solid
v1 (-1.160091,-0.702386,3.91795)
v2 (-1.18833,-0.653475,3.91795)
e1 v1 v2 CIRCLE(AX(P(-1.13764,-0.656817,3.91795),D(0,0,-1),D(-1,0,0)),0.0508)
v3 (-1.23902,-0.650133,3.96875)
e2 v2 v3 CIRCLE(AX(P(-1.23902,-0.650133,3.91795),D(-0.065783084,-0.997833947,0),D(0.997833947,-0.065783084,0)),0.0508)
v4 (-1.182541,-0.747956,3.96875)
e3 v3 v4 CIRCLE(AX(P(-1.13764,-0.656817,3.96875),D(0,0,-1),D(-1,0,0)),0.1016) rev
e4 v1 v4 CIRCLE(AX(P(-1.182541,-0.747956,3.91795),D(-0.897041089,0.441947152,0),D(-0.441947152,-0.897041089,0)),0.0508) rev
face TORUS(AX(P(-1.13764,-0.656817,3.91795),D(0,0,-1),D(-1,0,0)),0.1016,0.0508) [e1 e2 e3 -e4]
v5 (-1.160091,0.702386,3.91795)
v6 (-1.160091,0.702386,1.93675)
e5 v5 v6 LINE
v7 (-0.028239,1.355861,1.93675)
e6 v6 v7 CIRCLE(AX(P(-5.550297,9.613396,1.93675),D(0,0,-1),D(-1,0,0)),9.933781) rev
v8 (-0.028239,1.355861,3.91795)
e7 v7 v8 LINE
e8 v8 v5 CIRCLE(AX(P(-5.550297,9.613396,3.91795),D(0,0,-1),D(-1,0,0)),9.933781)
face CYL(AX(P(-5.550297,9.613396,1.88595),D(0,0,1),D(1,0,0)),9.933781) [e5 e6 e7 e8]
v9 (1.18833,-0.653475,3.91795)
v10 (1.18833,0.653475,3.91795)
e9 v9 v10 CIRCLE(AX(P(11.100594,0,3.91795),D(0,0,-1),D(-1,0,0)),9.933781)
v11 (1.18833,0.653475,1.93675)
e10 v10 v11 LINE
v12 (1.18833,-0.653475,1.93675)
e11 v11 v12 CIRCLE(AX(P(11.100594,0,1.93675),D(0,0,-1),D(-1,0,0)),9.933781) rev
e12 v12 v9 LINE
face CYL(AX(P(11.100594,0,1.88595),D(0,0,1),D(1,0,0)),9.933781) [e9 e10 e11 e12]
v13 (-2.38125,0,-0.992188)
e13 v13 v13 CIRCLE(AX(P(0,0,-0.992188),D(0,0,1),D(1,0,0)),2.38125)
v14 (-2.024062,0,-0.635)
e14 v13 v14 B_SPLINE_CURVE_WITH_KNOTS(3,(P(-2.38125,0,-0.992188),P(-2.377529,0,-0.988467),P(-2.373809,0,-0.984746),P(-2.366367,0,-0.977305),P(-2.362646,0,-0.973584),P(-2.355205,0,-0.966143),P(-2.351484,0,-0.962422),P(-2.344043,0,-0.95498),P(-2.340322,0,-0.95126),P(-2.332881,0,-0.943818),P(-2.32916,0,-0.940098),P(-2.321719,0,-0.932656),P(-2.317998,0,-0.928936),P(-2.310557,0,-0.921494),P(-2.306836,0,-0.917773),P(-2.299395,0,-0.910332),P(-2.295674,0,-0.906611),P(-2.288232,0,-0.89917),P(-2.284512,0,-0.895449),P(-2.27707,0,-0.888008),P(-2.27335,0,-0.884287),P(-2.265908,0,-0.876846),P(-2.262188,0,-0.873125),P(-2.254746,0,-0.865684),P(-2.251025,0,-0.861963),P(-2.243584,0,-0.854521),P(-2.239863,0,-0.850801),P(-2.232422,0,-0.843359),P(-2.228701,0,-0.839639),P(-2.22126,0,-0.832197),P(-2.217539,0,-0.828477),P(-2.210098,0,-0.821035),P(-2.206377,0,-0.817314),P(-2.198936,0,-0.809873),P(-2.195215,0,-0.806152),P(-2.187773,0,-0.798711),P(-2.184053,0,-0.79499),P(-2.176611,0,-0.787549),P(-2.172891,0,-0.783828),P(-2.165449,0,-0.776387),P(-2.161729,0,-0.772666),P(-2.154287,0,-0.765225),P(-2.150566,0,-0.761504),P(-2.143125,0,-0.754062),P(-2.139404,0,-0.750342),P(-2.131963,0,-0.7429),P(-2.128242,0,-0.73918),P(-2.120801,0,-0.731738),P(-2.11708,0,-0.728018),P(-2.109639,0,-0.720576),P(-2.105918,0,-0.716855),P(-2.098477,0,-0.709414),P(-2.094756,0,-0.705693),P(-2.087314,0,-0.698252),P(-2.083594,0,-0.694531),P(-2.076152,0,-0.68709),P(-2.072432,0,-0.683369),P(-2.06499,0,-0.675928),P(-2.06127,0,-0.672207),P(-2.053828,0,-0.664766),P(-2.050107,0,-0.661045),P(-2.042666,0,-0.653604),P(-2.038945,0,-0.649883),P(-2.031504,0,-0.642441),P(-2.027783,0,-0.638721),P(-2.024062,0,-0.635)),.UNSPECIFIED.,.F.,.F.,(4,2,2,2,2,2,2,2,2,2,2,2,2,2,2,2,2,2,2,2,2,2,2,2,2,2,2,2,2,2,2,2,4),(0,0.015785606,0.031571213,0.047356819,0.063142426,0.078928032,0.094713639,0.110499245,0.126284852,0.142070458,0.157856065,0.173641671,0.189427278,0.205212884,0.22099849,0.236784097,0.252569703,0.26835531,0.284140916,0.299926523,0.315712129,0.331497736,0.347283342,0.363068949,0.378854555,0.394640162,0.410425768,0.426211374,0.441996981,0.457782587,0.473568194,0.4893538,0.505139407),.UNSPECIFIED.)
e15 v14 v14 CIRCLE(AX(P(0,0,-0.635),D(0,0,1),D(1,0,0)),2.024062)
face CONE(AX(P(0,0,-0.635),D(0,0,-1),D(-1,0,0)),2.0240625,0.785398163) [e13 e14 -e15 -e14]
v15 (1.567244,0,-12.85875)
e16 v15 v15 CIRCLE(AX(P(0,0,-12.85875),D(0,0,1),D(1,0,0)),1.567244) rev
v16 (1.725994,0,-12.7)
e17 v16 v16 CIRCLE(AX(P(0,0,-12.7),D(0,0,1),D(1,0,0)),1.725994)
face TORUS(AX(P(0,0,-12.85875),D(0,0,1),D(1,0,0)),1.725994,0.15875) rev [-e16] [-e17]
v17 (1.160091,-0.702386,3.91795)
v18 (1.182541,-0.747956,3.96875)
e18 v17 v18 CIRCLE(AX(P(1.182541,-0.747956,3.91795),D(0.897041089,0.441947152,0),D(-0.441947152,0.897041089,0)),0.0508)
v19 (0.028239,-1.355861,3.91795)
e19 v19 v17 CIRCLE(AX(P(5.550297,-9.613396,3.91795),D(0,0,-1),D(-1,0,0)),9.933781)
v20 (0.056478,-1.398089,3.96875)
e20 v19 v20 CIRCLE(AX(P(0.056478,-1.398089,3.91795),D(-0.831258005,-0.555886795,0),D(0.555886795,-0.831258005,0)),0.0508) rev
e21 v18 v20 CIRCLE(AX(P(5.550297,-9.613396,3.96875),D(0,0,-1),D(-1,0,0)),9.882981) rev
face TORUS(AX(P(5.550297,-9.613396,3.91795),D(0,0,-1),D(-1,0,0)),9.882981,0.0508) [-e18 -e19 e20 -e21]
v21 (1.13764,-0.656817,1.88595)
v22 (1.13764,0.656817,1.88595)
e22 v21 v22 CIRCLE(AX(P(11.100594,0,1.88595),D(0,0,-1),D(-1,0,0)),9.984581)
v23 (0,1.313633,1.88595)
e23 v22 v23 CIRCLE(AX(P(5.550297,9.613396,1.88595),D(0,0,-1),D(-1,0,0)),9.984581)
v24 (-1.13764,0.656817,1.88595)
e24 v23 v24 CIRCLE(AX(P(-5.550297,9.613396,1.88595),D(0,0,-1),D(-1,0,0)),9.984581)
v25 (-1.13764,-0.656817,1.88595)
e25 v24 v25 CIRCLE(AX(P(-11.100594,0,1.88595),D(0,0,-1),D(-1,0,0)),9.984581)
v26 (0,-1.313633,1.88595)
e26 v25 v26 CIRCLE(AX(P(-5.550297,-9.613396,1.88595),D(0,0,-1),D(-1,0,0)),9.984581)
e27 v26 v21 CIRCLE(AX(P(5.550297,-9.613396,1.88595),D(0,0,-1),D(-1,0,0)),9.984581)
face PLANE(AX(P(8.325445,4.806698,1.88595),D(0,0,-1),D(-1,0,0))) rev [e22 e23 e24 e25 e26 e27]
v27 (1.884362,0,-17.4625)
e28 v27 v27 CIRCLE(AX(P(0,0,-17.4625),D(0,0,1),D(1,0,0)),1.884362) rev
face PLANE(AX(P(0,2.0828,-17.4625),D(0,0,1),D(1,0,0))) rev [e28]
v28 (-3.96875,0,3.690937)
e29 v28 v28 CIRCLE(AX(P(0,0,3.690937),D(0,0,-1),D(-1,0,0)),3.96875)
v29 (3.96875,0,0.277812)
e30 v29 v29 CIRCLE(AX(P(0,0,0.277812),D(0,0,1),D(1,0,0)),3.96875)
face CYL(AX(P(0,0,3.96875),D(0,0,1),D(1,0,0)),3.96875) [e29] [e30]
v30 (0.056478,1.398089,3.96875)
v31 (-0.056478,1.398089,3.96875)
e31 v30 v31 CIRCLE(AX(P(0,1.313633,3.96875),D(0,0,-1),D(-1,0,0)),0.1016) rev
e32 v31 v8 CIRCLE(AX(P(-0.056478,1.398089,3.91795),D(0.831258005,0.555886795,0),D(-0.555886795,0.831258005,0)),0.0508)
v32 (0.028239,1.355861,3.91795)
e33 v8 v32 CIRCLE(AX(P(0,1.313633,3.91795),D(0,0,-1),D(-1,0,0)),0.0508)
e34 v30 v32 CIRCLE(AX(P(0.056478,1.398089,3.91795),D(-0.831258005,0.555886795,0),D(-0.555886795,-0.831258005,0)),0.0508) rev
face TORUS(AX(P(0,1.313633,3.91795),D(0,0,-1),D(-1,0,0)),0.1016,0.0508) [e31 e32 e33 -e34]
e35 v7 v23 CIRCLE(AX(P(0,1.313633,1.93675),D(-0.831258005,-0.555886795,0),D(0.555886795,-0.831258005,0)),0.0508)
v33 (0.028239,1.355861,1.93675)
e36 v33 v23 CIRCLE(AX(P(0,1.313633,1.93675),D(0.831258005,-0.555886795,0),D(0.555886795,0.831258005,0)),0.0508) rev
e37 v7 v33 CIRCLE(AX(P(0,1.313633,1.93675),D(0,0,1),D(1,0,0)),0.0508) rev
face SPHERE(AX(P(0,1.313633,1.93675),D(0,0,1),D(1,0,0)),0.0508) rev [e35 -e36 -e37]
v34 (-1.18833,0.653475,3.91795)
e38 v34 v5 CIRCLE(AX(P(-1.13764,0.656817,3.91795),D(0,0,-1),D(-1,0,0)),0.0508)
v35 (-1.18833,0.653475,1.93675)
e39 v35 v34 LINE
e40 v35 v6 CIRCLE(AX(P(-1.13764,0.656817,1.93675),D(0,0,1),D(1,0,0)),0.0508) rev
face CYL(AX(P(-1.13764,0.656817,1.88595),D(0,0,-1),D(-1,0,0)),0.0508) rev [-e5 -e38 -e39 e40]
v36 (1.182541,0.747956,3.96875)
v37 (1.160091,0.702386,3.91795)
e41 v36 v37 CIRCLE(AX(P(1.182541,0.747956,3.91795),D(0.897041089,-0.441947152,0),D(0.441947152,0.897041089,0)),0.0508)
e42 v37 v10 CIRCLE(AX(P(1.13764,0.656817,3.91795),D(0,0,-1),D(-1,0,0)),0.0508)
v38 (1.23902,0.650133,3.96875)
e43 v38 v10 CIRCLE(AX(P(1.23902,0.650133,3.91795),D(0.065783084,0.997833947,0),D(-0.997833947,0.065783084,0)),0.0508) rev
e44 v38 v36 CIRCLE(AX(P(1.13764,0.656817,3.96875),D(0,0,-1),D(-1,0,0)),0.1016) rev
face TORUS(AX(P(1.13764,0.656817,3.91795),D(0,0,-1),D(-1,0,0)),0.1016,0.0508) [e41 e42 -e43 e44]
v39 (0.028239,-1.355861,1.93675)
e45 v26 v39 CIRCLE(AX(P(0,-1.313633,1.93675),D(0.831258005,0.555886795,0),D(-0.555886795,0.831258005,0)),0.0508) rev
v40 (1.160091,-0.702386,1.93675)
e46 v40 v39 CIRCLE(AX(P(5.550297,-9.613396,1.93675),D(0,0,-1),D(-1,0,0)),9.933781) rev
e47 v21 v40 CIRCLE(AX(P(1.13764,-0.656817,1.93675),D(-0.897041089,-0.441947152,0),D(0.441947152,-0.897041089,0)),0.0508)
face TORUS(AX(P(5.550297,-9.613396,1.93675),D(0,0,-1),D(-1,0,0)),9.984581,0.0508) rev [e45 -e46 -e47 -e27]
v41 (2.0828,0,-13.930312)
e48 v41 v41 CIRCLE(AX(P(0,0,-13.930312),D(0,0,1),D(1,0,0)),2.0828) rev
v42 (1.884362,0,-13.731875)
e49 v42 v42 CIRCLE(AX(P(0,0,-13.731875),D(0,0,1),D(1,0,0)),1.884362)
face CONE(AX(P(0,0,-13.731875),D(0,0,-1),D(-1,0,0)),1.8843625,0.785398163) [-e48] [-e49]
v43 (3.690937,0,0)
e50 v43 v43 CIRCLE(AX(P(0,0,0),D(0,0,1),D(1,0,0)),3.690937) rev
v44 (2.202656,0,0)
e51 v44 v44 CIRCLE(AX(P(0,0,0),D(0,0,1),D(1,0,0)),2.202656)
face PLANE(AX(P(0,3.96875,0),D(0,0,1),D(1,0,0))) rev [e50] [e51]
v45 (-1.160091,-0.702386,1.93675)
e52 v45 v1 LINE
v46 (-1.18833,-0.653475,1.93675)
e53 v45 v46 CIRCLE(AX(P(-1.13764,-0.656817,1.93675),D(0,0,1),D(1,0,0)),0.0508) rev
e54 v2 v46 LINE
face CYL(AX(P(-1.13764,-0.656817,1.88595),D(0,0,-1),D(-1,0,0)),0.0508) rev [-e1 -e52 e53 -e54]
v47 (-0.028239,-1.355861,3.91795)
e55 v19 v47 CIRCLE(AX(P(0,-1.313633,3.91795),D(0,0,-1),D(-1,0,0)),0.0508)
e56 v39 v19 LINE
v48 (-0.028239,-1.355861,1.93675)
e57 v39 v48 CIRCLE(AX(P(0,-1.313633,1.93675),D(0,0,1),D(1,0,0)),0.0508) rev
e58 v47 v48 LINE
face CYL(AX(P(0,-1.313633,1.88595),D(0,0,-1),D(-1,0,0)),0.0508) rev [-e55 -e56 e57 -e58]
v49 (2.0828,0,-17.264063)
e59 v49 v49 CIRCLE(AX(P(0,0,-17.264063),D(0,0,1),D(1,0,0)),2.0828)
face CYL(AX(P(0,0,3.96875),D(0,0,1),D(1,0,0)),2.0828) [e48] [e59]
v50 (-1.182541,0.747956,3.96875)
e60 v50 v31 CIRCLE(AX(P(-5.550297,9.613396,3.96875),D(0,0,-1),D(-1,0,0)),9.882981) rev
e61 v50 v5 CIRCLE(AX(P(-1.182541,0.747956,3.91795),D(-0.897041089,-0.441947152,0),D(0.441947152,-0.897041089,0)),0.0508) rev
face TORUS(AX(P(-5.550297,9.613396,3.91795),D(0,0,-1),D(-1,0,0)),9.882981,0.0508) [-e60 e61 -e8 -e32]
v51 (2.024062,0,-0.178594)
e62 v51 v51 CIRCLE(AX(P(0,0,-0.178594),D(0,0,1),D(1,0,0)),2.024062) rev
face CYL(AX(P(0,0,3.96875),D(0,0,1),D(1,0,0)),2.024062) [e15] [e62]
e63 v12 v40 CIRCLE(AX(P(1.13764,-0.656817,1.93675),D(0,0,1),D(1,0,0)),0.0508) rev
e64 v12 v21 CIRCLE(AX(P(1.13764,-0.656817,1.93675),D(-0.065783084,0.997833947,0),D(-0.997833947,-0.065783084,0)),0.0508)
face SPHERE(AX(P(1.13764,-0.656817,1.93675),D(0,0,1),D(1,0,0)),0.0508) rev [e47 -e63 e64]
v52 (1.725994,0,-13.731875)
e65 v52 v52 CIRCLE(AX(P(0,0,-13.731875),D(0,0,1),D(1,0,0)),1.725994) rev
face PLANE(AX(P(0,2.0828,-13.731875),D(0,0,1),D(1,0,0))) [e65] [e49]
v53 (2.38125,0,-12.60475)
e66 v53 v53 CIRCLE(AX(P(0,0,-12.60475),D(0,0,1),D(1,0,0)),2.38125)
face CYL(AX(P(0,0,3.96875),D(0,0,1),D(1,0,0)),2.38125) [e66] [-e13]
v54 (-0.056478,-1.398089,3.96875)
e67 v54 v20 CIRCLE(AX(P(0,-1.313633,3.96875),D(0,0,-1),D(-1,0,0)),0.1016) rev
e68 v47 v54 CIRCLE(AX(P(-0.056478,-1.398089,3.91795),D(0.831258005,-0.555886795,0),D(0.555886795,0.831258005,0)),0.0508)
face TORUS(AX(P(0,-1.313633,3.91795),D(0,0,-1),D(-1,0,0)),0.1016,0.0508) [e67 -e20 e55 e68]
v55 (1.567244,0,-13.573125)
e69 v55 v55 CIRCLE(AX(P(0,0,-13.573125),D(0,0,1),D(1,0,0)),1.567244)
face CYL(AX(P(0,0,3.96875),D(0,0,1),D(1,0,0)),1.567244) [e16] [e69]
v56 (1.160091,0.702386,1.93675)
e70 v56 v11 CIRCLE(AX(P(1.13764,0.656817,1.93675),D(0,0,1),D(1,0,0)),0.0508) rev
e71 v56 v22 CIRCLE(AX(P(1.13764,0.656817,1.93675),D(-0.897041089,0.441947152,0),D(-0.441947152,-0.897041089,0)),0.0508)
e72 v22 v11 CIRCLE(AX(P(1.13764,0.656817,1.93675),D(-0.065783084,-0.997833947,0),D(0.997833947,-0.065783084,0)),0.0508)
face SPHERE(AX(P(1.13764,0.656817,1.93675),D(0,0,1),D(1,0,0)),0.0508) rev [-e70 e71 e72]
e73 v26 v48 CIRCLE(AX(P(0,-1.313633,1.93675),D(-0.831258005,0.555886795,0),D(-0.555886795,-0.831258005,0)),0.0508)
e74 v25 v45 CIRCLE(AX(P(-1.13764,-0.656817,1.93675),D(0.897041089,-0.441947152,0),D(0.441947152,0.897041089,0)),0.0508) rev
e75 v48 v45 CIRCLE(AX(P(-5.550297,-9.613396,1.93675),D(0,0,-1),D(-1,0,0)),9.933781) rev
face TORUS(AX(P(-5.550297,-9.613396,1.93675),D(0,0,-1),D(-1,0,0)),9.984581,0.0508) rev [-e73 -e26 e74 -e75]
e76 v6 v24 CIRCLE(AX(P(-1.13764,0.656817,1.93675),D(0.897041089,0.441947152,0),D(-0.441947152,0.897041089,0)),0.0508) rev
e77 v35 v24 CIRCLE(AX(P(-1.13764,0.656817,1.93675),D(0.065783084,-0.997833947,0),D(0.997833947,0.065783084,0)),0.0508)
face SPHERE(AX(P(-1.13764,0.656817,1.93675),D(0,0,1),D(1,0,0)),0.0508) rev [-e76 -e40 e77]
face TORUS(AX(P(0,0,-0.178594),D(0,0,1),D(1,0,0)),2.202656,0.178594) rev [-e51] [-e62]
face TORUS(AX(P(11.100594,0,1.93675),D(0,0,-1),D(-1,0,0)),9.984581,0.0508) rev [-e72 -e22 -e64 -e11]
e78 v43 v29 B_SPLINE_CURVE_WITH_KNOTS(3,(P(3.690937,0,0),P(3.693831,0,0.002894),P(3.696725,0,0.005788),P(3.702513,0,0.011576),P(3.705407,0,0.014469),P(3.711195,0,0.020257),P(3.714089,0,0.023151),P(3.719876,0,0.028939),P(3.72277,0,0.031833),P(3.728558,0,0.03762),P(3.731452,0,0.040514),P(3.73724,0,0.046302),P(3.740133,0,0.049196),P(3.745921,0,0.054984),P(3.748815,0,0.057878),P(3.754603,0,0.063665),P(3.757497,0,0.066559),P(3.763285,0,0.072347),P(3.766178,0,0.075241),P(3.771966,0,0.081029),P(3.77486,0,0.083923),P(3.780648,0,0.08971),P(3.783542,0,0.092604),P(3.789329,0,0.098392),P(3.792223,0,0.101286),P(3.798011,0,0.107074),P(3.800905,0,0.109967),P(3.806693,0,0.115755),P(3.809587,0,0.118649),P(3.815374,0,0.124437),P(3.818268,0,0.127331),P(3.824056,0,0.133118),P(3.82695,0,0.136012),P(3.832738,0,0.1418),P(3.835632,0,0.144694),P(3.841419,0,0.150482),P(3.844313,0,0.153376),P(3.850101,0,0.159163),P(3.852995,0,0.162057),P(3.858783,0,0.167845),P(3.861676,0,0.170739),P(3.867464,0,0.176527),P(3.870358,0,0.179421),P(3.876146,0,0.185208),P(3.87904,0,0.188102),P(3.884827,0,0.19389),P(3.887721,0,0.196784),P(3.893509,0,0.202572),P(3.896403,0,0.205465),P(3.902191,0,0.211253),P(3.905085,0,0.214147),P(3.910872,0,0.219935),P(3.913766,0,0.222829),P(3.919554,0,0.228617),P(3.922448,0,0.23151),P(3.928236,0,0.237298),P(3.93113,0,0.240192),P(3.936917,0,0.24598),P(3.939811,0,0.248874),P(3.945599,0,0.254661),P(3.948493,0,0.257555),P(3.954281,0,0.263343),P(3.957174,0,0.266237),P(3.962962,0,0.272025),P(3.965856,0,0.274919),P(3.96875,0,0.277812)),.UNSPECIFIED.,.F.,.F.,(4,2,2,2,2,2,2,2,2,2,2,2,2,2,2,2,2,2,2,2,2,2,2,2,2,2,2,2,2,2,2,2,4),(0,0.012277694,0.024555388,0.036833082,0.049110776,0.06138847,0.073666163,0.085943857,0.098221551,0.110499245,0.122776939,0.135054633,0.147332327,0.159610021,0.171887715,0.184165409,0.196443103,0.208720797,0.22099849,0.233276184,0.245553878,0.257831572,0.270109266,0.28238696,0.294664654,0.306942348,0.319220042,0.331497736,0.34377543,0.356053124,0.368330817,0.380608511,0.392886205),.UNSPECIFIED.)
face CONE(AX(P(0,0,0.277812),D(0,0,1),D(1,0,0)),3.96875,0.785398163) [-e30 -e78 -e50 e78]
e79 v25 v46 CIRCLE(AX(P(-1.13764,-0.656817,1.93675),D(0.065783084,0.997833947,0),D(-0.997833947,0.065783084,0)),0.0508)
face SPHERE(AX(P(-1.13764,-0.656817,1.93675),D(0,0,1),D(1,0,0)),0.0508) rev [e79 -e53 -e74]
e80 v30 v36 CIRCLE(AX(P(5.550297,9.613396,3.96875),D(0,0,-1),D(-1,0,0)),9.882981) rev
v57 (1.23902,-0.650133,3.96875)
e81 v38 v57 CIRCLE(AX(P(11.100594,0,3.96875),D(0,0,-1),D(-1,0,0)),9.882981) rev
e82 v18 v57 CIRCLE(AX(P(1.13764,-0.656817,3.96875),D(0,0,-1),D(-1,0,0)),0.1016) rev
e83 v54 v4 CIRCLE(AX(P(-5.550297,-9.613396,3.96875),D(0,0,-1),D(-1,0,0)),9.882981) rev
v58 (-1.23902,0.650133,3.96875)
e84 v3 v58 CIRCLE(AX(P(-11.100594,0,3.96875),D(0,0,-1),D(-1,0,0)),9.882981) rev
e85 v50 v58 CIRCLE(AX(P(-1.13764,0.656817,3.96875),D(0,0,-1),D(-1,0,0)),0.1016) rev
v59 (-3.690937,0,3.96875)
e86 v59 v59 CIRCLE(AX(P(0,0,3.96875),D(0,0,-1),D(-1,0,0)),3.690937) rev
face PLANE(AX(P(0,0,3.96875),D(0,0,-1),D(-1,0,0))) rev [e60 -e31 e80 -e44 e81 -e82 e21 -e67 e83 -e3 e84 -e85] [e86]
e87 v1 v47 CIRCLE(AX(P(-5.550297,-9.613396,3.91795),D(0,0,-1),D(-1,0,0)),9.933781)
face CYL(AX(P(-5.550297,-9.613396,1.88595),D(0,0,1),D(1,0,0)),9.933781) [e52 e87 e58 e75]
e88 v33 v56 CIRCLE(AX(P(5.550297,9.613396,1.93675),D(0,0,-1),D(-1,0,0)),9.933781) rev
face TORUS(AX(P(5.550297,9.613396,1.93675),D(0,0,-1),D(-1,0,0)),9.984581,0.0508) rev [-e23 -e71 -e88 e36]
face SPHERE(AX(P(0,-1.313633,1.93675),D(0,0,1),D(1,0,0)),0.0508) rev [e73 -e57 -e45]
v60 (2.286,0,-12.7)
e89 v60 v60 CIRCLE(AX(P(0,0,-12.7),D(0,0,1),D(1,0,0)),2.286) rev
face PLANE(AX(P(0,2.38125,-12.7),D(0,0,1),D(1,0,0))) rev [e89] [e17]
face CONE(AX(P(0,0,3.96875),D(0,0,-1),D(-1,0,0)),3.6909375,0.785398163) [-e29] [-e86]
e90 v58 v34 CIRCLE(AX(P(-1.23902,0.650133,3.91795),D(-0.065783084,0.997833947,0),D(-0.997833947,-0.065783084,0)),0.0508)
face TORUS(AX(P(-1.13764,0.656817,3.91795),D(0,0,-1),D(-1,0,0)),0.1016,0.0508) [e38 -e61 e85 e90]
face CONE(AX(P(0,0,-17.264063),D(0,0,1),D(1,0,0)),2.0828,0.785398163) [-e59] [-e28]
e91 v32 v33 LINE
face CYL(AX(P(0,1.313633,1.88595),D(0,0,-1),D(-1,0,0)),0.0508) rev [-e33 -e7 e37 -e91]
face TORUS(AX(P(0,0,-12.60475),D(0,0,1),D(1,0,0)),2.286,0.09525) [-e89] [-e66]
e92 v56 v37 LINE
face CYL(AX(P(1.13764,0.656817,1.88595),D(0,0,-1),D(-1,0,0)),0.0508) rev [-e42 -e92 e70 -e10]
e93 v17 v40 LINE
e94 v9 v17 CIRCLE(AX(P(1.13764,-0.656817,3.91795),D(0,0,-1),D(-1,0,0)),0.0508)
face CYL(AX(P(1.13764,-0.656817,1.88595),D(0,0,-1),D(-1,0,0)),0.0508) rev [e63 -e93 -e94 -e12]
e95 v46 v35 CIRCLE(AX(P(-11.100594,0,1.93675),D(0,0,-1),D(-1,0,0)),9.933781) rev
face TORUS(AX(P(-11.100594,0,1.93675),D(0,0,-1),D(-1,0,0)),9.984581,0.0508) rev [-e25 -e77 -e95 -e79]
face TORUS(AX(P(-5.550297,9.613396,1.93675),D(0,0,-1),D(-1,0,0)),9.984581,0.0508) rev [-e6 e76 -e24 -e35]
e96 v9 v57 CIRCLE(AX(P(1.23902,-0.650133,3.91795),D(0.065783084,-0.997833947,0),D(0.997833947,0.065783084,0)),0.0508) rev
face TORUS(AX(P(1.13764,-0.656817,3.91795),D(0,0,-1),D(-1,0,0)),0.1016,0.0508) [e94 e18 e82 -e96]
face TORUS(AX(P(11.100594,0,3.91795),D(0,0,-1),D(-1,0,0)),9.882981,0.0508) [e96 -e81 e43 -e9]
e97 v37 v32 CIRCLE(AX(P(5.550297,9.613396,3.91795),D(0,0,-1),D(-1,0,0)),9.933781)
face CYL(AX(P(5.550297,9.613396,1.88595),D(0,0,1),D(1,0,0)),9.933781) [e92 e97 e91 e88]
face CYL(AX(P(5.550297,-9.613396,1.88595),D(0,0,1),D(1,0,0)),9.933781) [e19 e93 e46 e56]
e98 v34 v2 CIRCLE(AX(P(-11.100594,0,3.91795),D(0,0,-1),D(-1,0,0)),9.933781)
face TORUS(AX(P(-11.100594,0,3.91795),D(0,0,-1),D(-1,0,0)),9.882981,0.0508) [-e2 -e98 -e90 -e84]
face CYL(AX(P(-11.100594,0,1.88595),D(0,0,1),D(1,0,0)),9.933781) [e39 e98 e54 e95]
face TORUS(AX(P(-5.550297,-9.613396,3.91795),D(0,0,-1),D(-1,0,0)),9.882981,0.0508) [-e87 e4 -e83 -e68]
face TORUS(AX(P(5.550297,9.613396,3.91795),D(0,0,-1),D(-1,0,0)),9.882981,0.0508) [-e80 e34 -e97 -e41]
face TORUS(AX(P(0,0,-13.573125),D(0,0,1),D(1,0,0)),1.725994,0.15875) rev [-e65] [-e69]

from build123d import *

# Parameters (mm, degrees)
SKETCH4_W          = 0.9921875
SKETCH4_H          = 0.3571875
SKETCH4_W_2        = 1.031875
SKETCH4_H_2        = 0.515555748
CHAMFER1_SIZE      = 0.3571875
FILLET1_R          = 0.17859375
FILLET2_R          = 0.15875
CHAMFER2_SIZE      = 0.1984375
FILLET3_R          = 0.09525
CHAMFER3_SIZE      = 0.2778125
CUT_EXTRUDE1_DEPTH = 2.0828
FILLET4_R          = 0.0508


with BuildPart() as part:
    # Sketch3 → Revolve1 (revolve)
    with BuildSketch(Plane(origin=(0, 0, 0), x_dir=(0, 0, -1), z_dir=(1, 0, 0)), mode=Mode.PRIVATE) as revolve1_sk:
        Polygon((-3.96875, 3.96875), (0, 3.96875), (0, 2.38125), (12.7, 2.38125), (12.7, 2.0828), (17.4625, 2.0828), (17.4625, 0), (-3.96875, 0), align=None)
    revolve(revolve1_sk.sketch.rotate(Axis((0, 0, 3.96875), (0, 0, -1)), 90), axis=Axis((0, 0, 3.96875), (0, 0, -1)))

    # Sketch4 → Cut-Revolve1 (revolve, cut)
    with BuildSketch(Plane(origin=(0, 0, 0), x_dir=(0, 0, -1), z_dir=(1, 0, 0)), mode=Mode.PRIVATE) as cut_revolve1_sk:
        with Locations((0.49609375, 2.20265625)):
            Rectangle(SKETCH4_W, SKETCH4_H)
        with Locations((13.2159375, 1.825022126)):
            Rectangle(SKETCH4_W_2, SKETCH4_H_2)
    revolve(cut_revolve1_sk.sketch.rotate(Axis((0, 0, 3.96875), (0, 0, -1)), 90), axis=Axis((0, 0, 3.96875), (0, 0, -1)), mode=Mode.SUBTRACT)

    # Chamfer1
    chamfer1_edges = [part.edges().sort_by_distance(p)[0] for p in [
        (-2.0240625, 0, -0.9921875),
    ]]
    chamfer(chamfer1_edges, length=CHAMFER1_SIZE - 0.0001)  # a hair under: the kernel refuses the full size

    # Fillet1
    fillet1_edges = [part.edges().sort_by_distance(p)[0] for p in [
        (-2.0240625, 0, 0),
    ]]
    fillet(fillet1_edges, radius=FILLET1_R)

    # Fillet2
    fillet2_edges = [part.edges().sort_by_distance(p)[0] for p in [
        (-1.567244252, 0, -12.7),
        (-1.567244252, 0, -13.731875),
    ]]
    fillet(fillet2_edges, radius=FILLET2_R)

    # Chamfer2
    chamfer2_edges = [part.edges().sort_by_distance(p)[0] for p in [
        (-2.0828, 0, -13.731875),
        (-2.0828, 0, -17.4625),
    ]]
    chamfer(chamfer2_edges, length=CHAMFER2_SIZE)

    # Fillet3
    fillet3_edges = [part.edges().sort_by_distance(p)[0] for p in [
        (-2.38125, 0, -12.7),
    ]]
    fillet(fillet3_edges, radius=FILLET3_R)

    # Chamfer3
    chamfer3_edges = [part.edges().sort_by_distance(p)[0] for p in [
        (-3.96875, 0, 0),
        (-3.96875, 0, 3.96875),
    ]]
    chamfer(chamfer3_edges, length=CHAMFER3_SIZE)

    # Sketch5 → Cut-Extrude1 (cut)
    with BuildSketch(Plane.XY.offset(3.96875)):
        with BuildLine():
            ThreePointArc((1.190625, 0.687407664), (0.58340625, 1.010489266), (0, 1.374815329))
            ThreePointArc((0, 1.374815329), (-0.58340625, 1.010489266), (-1.190625, 0.687407664))
            ThreePointArc((-1.190625, 0.687407664), (-1.1668125, 0), (-1.190625, -0.687407664))
            ThreePointArc((-1.190625, -0.687407664), (-0.58340625, -1.010489266), (0, -1.374815329))
            ThreePointArc((0, -1.374815329), (0.58340625, -1.010489266), (1.190625, -0.687407664))
            ThreePointArc((1.190625, -0.687407664), (1.1668125, 0), (1.190625, 0.687407664))
        make_face()
    extrude(amount=-CUT_EXTRUDE1_DEPTH, mode=Mode.SUBTRACT)

    # Fillet4
    fillet4_edges = [part.edges().sort_by_distance(p)[0] for p in [
        (1.1668125, 0, 1.88595),
        (1.190625, 0.687407664, 2.92735),
        (0.58340625, -1.010489266, 1.88595),
        (1.190625, -0.687407664, 2.92735),
        (-0.58340625, -1.010489266, 1.88595),
        (0, -1.374815329, 2.92735),
        (-1.1668125, 0, 1.88595),
        (-1.190625, -0.687407664, 2.92735),
        (-0.58340625, 1.010489266, 1.88595),
        (-1.190625, 0.687407664, 2.92735),
        (0.58340625, 1.010489266, 1.88595),
        (0, 1.374815329, 2.92735),
        (1.1668125, 0, 3.96875),
        (0.58340625, 1.010489266, 3.96875),
        (-0.58340625, 1.010489266, 3.96875),
        (-1.1668125, 0, 3.96875),
        (-0.58340625, -1.010489266, 3.96875),
        (0.58340625, -1.010489266, 3.96875),
    ]]
    fillet(fillet4_edges, radius=FILLET4_R)


solid = part.part
